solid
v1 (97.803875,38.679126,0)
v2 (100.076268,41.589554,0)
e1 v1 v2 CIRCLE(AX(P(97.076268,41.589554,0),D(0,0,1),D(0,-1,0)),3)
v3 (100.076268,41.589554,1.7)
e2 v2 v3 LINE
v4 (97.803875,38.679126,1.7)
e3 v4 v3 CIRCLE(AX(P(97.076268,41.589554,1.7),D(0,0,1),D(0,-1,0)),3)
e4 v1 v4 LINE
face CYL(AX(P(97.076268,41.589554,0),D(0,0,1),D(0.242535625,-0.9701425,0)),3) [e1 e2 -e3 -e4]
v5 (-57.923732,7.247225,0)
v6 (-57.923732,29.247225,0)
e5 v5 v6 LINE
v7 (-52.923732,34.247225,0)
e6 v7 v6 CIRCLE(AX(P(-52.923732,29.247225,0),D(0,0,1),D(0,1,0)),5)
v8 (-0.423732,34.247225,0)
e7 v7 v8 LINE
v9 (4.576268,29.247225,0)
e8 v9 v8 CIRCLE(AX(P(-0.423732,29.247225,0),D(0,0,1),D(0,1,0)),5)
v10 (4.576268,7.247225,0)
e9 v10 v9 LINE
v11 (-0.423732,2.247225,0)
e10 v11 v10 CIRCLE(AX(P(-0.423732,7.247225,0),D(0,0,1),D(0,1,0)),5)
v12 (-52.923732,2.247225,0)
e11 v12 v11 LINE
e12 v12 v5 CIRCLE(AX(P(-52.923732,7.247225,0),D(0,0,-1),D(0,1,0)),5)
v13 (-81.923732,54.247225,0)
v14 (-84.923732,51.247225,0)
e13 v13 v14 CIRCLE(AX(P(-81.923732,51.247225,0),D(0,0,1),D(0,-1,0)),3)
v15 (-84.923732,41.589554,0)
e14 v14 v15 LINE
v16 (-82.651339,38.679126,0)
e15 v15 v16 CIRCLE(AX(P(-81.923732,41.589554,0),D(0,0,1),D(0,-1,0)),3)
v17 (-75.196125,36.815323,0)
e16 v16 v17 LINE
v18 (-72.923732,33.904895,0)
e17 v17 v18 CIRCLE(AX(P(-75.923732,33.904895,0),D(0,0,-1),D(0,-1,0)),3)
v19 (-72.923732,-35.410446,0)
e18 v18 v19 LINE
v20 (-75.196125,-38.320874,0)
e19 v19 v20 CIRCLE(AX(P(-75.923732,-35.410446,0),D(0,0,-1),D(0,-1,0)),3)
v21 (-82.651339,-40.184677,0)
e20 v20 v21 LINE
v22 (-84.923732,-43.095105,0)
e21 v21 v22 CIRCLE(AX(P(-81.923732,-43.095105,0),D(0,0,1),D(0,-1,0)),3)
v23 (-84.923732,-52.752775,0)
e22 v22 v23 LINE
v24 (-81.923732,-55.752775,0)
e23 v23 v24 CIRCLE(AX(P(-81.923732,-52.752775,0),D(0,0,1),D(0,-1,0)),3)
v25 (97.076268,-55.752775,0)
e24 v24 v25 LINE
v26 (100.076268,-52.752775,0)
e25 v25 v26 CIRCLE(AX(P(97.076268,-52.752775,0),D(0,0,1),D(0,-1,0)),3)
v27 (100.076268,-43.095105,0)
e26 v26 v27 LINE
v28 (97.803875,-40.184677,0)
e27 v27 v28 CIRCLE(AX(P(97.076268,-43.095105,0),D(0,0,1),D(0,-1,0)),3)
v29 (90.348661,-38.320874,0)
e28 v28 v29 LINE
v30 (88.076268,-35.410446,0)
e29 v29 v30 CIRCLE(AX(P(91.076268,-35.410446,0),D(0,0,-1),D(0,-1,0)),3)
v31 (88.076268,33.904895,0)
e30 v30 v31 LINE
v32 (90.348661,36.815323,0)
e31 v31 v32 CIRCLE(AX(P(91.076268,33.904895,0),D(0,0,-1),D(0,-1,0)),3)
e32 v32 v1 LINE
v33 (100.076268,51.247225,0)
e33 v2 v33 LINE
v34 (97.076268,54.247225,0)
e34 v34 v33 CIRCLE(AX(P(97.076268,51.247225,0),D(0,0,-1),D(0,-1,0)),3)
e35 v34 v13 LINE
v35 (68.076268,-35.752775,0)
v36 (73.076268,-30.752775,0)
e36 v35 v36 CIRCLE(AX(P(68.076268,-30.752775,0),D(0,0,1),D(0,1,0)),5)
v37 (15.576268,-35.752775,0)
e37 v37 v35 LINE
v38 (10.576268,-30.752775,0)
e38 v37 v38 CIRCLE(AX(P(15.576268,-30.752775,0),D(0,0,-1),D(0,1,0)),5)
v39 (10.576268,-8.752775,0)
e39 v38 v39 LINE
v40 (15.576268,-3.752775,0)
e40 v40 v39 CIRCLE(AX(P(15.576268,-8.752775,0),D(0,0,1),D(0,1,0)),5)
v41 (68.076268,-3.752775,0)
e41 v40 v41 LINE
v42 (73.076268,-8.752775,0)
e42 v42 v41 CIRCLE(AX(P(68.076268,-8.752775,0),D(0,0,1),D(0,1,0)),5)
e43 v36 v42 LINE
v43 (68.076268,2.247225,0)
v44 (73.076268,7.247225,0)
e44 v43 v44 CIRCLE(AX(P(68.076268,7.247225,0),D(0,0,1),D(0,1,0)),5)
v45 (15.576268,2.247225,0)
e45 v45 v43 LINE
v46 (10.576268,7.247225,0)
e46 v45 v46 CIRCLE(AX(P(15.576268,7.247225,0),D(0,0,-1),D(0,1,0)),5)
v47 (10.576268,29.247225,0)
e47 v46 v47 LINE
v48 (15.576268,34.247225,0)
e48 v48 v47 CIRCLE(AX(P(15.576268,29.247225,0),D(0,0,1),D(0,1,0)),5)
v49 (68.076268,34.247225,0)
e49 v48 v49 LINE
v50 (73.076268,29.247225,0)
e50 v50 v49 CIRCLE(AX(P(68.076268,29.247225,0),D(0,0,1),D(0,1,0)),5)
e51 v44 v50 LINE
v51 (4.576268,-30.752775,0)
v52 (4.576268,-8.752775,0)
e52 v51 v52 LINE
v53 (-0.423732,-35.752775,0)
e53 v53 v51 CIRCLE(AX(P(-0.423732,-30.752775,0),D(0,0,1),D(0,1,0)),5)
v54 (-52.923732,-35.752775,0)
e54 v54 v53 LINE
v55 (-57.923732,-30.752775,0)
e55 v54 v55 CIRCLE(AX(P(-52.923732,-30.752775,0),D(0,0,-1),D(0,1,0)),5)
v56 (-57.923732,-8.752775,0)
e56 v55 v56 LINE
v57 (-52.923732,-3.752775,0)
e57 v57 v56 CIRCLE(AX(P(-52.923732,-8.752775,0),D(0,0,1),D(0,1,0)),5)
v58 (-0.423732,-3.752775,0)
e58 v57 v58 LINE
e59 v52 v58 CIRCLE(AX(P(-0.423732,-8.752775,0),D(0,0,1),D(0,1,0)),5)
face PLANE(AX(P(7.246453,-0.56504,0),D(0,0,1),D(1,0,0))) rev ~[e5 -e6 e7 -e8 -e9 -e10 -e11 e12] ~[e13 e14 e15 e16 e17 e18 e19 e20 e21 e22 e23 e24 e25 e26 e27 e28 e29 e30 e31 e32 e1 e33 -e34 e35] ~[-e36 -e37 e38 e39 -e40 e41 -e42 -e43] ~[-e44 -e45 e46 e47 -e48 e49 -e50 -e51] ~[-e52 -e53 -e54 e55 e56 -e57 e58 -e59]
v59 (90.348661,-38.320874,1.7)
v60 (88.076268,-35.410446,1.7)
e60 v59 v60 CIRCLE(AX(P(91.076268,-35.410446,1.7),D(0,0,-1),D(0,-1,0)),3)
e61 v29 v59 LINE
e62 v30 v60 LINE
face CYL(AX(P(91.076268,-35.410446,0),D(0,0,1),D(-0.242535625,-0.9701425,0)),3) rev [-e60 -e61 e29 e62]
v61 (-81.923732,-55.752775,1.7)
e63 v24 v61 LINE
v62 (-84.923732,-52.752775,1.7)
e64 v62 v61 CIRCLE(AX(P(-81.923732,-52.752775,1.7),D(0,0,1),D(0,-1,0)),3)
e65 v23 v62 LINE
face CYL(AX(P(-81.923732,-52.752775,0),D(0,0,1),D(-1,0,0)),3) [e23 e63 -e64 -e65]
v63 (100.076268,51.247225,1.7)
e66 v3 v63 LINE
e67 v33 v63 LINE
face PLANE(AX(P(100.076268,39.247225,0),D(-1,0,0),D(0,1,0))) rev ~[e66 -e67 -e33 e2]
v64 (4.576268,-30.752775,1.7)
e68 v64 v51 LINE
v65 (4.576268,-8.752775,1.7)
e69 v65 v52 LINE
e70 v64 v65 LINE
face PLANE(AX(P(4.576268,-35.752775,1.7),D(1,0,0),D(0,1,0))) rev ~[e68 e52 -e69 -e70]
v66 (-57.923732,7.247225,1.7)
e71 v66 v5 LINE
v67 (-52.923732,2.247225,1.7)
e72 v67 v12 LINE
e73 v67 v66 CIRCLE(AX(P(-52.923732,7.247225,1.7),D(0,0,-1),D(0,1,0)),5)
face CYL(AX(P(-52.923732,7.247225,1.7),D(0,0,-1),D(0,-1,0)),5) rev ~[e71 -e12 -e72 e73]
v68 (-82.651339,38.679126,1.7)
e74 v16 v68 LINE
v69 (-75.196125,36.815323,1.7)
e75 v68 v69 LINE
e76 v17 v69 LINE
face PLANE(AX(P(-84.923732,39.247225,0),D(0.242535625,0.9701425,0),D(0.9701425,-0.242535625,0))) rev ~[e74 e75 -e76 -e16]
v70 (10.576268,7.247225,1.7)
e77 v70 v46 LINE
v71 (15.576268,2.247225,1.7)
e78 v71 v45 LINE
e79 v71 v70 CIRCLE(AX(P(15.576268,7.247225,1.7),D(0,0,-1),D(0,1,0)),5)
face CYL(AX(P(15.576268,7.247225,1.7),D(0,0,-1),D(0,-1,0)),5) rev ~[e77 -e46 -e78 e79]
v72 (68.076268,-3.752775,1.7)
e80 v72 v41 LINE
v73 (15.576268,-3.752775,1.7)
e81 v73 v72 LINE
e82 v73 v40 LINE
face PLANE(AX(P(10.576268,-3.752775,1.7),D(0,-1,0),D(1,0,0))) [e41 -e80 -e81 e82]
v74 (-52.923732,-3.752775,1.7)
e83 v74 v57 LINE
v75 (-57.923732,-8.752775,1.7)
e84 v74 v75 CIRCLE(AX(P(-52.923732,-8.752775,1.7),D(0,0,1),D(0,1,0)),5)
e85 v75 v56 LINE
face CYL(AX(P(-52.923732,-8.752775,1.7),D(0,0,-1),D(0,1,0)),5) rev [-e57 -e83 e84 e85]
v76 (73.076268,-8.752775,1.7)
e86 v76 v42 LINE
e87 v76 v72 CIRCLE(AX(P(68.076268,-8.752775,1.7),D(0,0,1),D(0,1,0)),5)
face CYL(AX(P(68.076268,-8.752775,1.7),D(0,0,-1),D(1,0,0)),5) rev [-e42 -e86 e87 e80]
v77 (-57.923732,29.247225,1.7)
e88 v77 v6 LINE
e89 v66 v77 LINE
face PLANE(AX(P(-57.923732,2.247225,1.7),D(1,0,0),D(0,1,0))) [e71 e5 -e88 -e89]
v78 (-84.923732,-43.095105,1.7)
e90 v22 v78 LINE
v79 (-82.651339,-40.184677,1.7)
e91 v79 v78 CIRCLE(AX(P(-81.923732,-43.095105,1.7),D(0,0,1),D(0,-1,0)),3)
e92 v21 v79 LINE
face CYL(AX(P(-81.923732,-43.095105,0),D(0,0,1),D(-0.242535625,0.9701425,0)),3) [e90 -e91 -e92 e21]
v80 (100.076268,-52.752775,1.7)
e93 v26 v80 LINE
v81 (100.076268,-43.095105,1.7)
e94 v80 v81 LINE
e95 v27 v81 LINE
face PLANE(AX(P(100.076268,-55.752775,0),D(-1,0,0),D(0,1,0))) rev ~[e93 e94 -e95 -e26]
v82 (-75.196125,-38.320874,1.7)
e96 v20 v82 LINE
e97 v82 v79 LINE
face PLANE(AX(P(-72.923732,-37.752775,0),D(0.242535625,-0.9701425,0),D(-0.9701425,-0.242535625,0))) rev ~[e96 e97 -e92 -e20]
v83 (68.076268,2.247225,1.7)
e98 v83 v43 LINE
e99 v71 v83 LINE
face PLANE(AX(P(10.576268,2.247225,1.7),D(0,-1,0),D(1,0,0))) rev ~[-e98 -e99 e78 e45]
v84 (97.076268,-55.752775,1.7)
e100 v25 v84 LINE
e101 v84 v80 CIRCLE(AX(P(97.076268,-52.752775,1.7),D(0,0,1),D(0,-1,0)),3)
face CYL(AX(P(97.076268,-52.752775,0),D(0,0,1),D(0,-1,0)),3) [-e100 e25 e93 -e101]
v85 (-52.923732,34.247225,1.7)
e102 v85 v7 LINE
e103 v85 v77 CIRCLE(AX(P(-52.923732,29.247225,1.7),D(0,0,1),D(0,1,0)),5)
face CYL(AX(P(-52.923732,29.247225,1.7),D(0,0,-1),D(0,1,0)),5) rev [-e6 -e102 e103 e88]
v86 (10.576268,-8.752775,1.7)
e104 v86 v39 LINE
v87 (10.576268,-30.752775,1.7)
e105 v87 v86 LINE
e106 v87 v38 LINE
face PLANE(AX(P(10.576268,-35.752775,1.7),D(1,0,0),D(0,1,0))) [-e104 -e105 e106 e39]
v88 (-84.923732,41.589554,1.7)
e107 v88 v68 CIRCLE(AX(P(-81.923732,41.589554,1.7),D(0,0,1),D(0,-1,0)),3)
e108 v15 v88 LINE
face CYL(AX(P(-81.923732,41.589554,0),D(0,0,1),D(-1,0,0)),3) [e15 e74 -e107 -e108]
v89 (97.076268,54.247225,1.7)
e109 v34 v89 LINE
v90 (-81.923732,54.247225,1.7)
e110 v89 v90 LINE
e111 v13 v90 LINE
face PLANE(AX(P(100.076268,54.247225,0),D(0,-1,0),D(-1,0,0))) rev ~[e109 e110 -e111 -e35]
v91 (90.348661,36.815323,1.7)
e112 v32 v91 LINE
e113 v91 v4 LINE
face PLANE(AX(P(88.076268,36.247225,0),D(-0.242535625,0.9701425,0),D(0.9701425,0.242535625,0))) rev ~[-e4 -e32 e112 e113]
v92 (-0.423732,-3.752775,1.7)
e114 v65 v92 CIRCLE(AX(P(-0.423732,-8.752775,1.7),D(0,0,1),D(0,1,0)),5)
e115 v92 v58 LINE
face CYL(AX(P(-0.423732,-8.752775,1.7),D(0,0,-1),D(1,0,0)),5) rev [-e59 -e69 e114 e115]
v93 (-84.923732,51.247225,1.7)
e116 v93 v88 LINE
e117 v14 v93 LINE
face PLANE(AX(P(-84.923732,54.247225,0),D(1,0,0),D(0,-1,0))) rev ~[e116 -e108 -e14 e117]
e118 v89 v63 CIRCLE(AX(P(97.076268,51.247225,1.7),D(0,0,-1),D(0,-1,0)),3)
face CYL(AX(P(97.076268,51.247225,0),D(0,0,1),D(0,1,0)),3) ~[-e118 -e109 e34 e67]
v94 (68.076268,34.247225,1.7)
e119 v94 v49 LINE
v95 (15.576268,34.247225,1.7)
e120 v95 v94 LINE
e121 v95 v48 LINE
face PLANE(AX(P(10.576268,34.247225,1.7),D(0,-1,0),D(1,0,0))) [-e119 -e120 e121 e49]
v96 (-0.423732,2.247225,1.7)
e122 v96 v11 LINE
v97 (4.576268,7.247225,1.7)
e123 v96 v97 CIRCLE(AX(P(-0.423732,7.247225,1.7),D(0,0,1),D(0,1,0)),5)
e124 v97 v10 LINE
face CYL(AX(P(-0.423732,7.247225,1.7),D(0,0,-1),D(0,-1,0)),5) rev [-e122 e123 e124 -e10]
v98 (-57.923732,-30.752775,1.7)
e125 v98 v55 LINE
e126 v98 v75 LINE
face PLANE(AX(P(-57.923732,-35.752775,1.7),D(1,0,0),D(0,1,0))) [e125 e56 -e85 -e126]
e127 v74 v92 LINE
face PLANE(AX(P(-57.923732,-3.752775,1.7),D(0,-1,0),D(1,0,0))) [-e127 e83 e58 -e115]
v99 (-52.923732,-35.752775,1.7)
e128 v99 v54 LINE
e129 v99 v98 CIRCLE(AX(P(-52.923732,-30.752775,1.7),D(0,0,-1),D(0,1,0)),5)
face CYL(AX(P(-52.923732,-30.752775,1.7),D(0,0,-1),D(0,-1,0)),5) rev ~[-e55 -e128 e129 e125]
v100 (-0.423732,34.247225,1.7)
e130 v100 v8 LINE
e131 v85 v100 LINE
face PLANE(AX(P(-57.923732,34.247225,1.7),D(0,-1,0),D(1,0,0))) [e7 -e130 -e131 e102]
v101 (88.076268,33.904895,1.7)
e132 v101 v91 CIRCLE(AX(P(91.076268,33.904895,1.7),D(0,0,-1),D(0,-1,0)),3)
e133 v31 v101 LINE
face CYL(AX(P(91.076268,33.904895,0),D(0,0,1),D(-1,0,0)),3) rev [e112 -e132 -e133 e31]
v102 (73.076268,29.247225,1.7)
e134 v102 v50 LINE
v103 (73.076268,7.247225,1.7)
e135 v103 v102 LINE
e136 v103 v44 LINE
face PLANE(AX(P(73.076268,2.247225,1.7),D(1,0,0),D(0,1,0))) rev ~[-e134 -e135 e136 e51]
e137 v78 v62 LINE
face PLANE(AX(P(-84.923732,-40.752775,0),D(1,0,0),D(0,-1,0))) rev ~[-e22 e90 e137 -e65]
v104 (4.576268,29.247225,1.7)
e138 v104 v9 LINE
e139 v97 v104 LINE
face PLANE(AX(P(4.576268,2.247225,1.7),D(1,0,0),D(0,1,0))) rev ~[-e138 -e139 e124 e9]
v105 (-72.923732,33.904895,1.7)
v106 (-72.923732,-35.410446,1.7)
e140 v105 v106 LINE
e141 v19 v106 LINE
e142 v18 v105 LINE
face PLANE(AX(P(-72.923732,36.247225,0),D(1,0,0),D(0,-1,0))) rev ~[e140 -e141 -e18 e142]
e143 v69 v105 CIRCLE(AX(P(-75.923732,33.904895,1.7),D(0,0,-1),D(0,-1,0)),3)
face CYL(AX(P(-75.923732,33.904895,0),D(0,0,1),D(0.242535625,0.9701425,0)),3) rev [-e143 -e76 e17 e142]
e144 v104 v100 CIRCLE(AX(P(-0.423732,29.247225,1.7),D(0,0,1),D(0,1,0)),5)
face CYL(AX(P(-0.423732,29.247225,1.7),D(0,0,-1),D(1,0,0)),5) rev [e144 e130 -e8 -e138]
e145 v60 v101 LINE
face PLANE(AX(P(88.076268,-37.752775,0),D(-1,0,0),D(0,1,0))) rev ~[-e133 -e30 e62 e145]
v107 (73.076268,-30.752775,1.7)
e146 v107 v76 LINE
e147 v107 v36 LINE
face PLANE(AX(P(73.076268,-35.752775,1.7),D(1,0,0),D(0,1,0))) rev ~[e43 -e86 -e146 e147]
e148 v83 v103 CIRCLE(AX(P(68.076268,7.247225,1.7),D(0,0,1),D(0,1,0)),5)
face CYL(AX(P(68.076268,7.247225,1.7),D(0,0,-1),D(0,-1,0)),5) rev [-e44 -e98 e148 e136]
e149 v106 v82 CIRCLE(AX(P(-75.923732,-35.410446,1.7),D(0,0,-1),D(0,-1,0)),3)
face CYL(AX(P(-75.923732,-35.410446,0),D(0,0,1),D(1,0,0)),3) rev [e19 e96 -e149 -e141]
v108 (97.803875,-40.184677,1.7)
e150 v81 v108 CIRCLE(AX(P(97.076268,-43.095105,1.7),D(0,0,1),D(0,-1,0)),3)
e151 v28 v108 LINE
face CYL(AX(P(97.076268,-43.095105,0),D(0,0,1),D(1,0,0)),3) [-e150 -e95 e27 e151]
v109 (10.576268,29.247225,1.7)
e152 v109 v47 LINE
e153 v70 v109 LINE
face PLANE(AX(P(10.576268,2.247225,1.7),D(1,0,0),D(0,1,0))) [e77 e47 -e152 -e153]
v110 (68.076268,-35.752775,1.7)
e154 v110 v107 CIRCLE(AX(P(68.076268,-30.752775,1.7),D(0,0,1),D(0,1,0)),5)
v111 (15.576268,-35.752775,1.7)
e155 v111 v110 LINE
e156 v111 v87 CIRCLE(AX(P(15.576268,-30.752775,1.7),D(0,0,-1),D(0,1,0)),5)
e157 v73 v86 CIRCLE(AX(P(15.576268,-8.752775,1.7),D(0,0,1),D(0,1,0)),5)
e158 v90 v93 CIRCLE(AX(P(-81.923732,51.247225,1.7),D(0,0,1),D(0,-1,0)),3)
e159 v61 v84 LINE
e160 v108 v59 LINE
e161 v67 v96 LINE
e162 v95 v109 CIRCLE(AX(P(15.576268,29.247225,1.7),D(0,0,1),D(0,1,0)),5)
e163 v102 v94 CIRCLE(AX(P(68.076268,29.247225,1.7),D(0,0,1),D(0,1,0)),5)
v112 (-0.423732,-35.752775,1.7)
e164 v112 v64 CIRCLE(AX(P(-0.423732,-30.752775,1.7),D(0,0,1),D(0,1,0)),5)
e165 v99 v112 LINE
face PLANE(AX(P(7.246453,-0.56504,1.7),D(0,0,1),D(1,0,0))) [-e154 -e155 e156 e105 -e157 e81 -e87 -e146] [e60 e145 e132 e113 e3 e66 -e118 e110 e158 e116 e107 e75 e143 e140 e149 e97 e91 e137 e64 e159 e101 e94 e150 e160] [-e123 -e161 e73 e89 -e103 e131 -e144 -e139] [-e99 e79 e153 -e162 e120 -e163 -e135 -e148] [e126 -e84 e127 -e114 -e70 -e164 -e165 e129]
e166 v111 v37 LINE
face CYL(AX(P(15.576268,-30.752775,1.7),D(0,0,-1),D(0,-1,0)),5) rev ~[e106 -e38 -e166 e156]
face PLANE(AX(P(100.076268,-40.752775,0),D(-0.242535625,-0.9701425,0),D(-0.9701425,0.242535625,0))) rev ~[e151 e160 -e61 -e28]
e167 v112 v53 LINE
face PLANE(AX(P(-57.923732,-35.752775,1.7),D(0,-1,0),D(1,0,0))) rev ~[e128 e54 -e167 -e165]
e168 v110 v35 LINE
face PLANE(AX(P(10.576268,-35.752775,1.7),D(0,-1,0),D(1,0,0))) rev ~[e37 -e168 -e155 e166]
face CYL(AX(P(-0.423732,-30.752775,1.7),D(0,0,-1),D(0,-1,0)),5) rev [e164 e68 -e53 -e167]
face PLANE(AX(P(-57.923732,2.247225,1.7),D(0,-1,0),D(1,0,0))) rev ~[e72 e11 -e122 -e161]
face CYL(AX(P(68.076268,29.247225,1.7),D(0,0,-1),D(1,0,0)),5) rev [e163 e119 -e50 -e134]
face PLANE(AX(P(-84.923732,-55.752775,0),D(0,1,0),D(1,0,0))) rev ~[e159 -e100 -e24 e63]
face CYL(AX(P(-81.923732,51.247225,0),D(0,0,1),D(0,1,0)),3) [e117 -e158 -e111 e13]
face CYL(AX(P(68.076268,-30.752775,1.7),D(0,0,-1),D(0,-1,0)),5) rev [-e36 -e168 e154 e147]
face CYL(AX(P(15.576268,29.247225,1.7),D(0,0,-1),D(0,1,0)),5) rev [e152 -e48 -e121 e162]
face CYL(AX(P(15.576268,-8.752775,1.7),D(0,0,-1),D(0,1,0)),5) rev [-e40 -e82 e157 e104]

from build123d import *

# Parameters (mm, degrees)
F1_DEPTH = 1.7
F2_R     = 3
F3_W     = 62.5
F3_H     = 32
F4_DEPTH = 1.701
F5_R     = 5


with BuildPart() as f1:
    # F0 (on Top) → F1 (new body)
    with BuildSketch(Plane.XY):
        Polygon((100.0762677759, 54.24722471), (-84.9237322241, 54.24722471), (-84.9237322241, 39.24722471), (-72.9237322241, 39.24722471), (-72.9237322241, 36.24722471), (-72.9237322241, -37.75277529), (-72.9237322241, -40.75277529), (-84.9237322241, -40.75277529), (-84.9237322241, -55.75277529), (100.0762677759, -55.75277529), (100.0762677759, -40.75277529), (88.0762677759, -37.75277529), (88.0762677759, 36.24722471), (88.0762677759, 39.24722471), (100.0762677759, 39.24722471), align=None)
        Polygon((88.0762677759, 36.24722471), (100.0762677759, 39.24722471), (88.0762677759, 39.24722471), align=None)
        Polygon((-72.9237322241, 39.24722471), (-84.9237322241, 39.24722471), (-72.9237322241, 36.24722471), align=None)
        Polygon((-72.9237322241, -40.75277529), (-72.9237322241, -37.75277529), (-84.9237322241, -40.75277529), align=None)
    extrude(amount=F1_DEPTH)

    # F2
    f2_edges = [f1.edges().sort_by_distance(p)[0] for p in [
        (-72.923732, -37.752775, 0.85),
        (-72.923732, 36.247225, 0.85),
        (-84.923732, 39.247225, 0.85),
        (-84.923732, -40.752775, 0.85),
        (88.076268, 36.247225, 0.85),
        (100.076268, 39.247225, 0.85),
        (-84.923732, -55.752775, 0.85),
        (-84.923732, 54.247225, 0.85),
        (100.076268, 54.247225, 0.85),
        (100.076268, -55.752775, 0.85),
        (100.076268, -40.752775, 0.85),
        (88.076268, -37.752775, 0.85),
    ]]
    fillet(f2_edges, radius=F2_R)

    # F3 (on face) → F4 (cut, through all)
    with BuildSketch(Plane.XY.offset(1.7)):
        with Locations((-26.6737322241, 18.24722471)):
            Rectangle(F3_W, F3_H)
        with Locations((-26.6737322241, -19.75277529)):
            Rectangle(F3_W, F3_H)
        with Locations((41.8262677759, 18.24722471)):
            Rectangle(F3_W, F3_H)
        with Locations((41.8262677759, -19.75277529)):
            Rectangle(F3_W, F3_H)
    extrude(amount=-F4_DEPTH, mode=Mode.SUBTRACT)

    # F5
    f5_edges = [f1.edges().sort_by_distance(p)[0] for p in [
        (-57.923732, 34.247225, 0.85),
        (4.576268, 2.247225, 0.85),
        (73.076268, -35.752775, 0.85),
        (10.576268, -35.752775, 0.85),
        (10.576268, 2.247225, 0.85),
        (10.576268, -3.752775, 0.85),
        (10.576268, 34.247225, 0.85),
        (-57.923732, -3.752775, 0.85),
        (4.576268, -3.752775, 0.85),
        (73.076268, -3.752775, 0.85),
        (4.576268, -35.752775, 0.85),
        (-57.923732, -35.752775, 0.85),
        (4.576268, 34.247225, 0.85),
        (-57.923732, 2.247225, 0.85),
        (73.076268, 34.247225, 0.85),
        (73.076268, 2.247225, 0.85),
    ]]
    fillet(f5_edges, radius=F5_R)


solid = f1.part
